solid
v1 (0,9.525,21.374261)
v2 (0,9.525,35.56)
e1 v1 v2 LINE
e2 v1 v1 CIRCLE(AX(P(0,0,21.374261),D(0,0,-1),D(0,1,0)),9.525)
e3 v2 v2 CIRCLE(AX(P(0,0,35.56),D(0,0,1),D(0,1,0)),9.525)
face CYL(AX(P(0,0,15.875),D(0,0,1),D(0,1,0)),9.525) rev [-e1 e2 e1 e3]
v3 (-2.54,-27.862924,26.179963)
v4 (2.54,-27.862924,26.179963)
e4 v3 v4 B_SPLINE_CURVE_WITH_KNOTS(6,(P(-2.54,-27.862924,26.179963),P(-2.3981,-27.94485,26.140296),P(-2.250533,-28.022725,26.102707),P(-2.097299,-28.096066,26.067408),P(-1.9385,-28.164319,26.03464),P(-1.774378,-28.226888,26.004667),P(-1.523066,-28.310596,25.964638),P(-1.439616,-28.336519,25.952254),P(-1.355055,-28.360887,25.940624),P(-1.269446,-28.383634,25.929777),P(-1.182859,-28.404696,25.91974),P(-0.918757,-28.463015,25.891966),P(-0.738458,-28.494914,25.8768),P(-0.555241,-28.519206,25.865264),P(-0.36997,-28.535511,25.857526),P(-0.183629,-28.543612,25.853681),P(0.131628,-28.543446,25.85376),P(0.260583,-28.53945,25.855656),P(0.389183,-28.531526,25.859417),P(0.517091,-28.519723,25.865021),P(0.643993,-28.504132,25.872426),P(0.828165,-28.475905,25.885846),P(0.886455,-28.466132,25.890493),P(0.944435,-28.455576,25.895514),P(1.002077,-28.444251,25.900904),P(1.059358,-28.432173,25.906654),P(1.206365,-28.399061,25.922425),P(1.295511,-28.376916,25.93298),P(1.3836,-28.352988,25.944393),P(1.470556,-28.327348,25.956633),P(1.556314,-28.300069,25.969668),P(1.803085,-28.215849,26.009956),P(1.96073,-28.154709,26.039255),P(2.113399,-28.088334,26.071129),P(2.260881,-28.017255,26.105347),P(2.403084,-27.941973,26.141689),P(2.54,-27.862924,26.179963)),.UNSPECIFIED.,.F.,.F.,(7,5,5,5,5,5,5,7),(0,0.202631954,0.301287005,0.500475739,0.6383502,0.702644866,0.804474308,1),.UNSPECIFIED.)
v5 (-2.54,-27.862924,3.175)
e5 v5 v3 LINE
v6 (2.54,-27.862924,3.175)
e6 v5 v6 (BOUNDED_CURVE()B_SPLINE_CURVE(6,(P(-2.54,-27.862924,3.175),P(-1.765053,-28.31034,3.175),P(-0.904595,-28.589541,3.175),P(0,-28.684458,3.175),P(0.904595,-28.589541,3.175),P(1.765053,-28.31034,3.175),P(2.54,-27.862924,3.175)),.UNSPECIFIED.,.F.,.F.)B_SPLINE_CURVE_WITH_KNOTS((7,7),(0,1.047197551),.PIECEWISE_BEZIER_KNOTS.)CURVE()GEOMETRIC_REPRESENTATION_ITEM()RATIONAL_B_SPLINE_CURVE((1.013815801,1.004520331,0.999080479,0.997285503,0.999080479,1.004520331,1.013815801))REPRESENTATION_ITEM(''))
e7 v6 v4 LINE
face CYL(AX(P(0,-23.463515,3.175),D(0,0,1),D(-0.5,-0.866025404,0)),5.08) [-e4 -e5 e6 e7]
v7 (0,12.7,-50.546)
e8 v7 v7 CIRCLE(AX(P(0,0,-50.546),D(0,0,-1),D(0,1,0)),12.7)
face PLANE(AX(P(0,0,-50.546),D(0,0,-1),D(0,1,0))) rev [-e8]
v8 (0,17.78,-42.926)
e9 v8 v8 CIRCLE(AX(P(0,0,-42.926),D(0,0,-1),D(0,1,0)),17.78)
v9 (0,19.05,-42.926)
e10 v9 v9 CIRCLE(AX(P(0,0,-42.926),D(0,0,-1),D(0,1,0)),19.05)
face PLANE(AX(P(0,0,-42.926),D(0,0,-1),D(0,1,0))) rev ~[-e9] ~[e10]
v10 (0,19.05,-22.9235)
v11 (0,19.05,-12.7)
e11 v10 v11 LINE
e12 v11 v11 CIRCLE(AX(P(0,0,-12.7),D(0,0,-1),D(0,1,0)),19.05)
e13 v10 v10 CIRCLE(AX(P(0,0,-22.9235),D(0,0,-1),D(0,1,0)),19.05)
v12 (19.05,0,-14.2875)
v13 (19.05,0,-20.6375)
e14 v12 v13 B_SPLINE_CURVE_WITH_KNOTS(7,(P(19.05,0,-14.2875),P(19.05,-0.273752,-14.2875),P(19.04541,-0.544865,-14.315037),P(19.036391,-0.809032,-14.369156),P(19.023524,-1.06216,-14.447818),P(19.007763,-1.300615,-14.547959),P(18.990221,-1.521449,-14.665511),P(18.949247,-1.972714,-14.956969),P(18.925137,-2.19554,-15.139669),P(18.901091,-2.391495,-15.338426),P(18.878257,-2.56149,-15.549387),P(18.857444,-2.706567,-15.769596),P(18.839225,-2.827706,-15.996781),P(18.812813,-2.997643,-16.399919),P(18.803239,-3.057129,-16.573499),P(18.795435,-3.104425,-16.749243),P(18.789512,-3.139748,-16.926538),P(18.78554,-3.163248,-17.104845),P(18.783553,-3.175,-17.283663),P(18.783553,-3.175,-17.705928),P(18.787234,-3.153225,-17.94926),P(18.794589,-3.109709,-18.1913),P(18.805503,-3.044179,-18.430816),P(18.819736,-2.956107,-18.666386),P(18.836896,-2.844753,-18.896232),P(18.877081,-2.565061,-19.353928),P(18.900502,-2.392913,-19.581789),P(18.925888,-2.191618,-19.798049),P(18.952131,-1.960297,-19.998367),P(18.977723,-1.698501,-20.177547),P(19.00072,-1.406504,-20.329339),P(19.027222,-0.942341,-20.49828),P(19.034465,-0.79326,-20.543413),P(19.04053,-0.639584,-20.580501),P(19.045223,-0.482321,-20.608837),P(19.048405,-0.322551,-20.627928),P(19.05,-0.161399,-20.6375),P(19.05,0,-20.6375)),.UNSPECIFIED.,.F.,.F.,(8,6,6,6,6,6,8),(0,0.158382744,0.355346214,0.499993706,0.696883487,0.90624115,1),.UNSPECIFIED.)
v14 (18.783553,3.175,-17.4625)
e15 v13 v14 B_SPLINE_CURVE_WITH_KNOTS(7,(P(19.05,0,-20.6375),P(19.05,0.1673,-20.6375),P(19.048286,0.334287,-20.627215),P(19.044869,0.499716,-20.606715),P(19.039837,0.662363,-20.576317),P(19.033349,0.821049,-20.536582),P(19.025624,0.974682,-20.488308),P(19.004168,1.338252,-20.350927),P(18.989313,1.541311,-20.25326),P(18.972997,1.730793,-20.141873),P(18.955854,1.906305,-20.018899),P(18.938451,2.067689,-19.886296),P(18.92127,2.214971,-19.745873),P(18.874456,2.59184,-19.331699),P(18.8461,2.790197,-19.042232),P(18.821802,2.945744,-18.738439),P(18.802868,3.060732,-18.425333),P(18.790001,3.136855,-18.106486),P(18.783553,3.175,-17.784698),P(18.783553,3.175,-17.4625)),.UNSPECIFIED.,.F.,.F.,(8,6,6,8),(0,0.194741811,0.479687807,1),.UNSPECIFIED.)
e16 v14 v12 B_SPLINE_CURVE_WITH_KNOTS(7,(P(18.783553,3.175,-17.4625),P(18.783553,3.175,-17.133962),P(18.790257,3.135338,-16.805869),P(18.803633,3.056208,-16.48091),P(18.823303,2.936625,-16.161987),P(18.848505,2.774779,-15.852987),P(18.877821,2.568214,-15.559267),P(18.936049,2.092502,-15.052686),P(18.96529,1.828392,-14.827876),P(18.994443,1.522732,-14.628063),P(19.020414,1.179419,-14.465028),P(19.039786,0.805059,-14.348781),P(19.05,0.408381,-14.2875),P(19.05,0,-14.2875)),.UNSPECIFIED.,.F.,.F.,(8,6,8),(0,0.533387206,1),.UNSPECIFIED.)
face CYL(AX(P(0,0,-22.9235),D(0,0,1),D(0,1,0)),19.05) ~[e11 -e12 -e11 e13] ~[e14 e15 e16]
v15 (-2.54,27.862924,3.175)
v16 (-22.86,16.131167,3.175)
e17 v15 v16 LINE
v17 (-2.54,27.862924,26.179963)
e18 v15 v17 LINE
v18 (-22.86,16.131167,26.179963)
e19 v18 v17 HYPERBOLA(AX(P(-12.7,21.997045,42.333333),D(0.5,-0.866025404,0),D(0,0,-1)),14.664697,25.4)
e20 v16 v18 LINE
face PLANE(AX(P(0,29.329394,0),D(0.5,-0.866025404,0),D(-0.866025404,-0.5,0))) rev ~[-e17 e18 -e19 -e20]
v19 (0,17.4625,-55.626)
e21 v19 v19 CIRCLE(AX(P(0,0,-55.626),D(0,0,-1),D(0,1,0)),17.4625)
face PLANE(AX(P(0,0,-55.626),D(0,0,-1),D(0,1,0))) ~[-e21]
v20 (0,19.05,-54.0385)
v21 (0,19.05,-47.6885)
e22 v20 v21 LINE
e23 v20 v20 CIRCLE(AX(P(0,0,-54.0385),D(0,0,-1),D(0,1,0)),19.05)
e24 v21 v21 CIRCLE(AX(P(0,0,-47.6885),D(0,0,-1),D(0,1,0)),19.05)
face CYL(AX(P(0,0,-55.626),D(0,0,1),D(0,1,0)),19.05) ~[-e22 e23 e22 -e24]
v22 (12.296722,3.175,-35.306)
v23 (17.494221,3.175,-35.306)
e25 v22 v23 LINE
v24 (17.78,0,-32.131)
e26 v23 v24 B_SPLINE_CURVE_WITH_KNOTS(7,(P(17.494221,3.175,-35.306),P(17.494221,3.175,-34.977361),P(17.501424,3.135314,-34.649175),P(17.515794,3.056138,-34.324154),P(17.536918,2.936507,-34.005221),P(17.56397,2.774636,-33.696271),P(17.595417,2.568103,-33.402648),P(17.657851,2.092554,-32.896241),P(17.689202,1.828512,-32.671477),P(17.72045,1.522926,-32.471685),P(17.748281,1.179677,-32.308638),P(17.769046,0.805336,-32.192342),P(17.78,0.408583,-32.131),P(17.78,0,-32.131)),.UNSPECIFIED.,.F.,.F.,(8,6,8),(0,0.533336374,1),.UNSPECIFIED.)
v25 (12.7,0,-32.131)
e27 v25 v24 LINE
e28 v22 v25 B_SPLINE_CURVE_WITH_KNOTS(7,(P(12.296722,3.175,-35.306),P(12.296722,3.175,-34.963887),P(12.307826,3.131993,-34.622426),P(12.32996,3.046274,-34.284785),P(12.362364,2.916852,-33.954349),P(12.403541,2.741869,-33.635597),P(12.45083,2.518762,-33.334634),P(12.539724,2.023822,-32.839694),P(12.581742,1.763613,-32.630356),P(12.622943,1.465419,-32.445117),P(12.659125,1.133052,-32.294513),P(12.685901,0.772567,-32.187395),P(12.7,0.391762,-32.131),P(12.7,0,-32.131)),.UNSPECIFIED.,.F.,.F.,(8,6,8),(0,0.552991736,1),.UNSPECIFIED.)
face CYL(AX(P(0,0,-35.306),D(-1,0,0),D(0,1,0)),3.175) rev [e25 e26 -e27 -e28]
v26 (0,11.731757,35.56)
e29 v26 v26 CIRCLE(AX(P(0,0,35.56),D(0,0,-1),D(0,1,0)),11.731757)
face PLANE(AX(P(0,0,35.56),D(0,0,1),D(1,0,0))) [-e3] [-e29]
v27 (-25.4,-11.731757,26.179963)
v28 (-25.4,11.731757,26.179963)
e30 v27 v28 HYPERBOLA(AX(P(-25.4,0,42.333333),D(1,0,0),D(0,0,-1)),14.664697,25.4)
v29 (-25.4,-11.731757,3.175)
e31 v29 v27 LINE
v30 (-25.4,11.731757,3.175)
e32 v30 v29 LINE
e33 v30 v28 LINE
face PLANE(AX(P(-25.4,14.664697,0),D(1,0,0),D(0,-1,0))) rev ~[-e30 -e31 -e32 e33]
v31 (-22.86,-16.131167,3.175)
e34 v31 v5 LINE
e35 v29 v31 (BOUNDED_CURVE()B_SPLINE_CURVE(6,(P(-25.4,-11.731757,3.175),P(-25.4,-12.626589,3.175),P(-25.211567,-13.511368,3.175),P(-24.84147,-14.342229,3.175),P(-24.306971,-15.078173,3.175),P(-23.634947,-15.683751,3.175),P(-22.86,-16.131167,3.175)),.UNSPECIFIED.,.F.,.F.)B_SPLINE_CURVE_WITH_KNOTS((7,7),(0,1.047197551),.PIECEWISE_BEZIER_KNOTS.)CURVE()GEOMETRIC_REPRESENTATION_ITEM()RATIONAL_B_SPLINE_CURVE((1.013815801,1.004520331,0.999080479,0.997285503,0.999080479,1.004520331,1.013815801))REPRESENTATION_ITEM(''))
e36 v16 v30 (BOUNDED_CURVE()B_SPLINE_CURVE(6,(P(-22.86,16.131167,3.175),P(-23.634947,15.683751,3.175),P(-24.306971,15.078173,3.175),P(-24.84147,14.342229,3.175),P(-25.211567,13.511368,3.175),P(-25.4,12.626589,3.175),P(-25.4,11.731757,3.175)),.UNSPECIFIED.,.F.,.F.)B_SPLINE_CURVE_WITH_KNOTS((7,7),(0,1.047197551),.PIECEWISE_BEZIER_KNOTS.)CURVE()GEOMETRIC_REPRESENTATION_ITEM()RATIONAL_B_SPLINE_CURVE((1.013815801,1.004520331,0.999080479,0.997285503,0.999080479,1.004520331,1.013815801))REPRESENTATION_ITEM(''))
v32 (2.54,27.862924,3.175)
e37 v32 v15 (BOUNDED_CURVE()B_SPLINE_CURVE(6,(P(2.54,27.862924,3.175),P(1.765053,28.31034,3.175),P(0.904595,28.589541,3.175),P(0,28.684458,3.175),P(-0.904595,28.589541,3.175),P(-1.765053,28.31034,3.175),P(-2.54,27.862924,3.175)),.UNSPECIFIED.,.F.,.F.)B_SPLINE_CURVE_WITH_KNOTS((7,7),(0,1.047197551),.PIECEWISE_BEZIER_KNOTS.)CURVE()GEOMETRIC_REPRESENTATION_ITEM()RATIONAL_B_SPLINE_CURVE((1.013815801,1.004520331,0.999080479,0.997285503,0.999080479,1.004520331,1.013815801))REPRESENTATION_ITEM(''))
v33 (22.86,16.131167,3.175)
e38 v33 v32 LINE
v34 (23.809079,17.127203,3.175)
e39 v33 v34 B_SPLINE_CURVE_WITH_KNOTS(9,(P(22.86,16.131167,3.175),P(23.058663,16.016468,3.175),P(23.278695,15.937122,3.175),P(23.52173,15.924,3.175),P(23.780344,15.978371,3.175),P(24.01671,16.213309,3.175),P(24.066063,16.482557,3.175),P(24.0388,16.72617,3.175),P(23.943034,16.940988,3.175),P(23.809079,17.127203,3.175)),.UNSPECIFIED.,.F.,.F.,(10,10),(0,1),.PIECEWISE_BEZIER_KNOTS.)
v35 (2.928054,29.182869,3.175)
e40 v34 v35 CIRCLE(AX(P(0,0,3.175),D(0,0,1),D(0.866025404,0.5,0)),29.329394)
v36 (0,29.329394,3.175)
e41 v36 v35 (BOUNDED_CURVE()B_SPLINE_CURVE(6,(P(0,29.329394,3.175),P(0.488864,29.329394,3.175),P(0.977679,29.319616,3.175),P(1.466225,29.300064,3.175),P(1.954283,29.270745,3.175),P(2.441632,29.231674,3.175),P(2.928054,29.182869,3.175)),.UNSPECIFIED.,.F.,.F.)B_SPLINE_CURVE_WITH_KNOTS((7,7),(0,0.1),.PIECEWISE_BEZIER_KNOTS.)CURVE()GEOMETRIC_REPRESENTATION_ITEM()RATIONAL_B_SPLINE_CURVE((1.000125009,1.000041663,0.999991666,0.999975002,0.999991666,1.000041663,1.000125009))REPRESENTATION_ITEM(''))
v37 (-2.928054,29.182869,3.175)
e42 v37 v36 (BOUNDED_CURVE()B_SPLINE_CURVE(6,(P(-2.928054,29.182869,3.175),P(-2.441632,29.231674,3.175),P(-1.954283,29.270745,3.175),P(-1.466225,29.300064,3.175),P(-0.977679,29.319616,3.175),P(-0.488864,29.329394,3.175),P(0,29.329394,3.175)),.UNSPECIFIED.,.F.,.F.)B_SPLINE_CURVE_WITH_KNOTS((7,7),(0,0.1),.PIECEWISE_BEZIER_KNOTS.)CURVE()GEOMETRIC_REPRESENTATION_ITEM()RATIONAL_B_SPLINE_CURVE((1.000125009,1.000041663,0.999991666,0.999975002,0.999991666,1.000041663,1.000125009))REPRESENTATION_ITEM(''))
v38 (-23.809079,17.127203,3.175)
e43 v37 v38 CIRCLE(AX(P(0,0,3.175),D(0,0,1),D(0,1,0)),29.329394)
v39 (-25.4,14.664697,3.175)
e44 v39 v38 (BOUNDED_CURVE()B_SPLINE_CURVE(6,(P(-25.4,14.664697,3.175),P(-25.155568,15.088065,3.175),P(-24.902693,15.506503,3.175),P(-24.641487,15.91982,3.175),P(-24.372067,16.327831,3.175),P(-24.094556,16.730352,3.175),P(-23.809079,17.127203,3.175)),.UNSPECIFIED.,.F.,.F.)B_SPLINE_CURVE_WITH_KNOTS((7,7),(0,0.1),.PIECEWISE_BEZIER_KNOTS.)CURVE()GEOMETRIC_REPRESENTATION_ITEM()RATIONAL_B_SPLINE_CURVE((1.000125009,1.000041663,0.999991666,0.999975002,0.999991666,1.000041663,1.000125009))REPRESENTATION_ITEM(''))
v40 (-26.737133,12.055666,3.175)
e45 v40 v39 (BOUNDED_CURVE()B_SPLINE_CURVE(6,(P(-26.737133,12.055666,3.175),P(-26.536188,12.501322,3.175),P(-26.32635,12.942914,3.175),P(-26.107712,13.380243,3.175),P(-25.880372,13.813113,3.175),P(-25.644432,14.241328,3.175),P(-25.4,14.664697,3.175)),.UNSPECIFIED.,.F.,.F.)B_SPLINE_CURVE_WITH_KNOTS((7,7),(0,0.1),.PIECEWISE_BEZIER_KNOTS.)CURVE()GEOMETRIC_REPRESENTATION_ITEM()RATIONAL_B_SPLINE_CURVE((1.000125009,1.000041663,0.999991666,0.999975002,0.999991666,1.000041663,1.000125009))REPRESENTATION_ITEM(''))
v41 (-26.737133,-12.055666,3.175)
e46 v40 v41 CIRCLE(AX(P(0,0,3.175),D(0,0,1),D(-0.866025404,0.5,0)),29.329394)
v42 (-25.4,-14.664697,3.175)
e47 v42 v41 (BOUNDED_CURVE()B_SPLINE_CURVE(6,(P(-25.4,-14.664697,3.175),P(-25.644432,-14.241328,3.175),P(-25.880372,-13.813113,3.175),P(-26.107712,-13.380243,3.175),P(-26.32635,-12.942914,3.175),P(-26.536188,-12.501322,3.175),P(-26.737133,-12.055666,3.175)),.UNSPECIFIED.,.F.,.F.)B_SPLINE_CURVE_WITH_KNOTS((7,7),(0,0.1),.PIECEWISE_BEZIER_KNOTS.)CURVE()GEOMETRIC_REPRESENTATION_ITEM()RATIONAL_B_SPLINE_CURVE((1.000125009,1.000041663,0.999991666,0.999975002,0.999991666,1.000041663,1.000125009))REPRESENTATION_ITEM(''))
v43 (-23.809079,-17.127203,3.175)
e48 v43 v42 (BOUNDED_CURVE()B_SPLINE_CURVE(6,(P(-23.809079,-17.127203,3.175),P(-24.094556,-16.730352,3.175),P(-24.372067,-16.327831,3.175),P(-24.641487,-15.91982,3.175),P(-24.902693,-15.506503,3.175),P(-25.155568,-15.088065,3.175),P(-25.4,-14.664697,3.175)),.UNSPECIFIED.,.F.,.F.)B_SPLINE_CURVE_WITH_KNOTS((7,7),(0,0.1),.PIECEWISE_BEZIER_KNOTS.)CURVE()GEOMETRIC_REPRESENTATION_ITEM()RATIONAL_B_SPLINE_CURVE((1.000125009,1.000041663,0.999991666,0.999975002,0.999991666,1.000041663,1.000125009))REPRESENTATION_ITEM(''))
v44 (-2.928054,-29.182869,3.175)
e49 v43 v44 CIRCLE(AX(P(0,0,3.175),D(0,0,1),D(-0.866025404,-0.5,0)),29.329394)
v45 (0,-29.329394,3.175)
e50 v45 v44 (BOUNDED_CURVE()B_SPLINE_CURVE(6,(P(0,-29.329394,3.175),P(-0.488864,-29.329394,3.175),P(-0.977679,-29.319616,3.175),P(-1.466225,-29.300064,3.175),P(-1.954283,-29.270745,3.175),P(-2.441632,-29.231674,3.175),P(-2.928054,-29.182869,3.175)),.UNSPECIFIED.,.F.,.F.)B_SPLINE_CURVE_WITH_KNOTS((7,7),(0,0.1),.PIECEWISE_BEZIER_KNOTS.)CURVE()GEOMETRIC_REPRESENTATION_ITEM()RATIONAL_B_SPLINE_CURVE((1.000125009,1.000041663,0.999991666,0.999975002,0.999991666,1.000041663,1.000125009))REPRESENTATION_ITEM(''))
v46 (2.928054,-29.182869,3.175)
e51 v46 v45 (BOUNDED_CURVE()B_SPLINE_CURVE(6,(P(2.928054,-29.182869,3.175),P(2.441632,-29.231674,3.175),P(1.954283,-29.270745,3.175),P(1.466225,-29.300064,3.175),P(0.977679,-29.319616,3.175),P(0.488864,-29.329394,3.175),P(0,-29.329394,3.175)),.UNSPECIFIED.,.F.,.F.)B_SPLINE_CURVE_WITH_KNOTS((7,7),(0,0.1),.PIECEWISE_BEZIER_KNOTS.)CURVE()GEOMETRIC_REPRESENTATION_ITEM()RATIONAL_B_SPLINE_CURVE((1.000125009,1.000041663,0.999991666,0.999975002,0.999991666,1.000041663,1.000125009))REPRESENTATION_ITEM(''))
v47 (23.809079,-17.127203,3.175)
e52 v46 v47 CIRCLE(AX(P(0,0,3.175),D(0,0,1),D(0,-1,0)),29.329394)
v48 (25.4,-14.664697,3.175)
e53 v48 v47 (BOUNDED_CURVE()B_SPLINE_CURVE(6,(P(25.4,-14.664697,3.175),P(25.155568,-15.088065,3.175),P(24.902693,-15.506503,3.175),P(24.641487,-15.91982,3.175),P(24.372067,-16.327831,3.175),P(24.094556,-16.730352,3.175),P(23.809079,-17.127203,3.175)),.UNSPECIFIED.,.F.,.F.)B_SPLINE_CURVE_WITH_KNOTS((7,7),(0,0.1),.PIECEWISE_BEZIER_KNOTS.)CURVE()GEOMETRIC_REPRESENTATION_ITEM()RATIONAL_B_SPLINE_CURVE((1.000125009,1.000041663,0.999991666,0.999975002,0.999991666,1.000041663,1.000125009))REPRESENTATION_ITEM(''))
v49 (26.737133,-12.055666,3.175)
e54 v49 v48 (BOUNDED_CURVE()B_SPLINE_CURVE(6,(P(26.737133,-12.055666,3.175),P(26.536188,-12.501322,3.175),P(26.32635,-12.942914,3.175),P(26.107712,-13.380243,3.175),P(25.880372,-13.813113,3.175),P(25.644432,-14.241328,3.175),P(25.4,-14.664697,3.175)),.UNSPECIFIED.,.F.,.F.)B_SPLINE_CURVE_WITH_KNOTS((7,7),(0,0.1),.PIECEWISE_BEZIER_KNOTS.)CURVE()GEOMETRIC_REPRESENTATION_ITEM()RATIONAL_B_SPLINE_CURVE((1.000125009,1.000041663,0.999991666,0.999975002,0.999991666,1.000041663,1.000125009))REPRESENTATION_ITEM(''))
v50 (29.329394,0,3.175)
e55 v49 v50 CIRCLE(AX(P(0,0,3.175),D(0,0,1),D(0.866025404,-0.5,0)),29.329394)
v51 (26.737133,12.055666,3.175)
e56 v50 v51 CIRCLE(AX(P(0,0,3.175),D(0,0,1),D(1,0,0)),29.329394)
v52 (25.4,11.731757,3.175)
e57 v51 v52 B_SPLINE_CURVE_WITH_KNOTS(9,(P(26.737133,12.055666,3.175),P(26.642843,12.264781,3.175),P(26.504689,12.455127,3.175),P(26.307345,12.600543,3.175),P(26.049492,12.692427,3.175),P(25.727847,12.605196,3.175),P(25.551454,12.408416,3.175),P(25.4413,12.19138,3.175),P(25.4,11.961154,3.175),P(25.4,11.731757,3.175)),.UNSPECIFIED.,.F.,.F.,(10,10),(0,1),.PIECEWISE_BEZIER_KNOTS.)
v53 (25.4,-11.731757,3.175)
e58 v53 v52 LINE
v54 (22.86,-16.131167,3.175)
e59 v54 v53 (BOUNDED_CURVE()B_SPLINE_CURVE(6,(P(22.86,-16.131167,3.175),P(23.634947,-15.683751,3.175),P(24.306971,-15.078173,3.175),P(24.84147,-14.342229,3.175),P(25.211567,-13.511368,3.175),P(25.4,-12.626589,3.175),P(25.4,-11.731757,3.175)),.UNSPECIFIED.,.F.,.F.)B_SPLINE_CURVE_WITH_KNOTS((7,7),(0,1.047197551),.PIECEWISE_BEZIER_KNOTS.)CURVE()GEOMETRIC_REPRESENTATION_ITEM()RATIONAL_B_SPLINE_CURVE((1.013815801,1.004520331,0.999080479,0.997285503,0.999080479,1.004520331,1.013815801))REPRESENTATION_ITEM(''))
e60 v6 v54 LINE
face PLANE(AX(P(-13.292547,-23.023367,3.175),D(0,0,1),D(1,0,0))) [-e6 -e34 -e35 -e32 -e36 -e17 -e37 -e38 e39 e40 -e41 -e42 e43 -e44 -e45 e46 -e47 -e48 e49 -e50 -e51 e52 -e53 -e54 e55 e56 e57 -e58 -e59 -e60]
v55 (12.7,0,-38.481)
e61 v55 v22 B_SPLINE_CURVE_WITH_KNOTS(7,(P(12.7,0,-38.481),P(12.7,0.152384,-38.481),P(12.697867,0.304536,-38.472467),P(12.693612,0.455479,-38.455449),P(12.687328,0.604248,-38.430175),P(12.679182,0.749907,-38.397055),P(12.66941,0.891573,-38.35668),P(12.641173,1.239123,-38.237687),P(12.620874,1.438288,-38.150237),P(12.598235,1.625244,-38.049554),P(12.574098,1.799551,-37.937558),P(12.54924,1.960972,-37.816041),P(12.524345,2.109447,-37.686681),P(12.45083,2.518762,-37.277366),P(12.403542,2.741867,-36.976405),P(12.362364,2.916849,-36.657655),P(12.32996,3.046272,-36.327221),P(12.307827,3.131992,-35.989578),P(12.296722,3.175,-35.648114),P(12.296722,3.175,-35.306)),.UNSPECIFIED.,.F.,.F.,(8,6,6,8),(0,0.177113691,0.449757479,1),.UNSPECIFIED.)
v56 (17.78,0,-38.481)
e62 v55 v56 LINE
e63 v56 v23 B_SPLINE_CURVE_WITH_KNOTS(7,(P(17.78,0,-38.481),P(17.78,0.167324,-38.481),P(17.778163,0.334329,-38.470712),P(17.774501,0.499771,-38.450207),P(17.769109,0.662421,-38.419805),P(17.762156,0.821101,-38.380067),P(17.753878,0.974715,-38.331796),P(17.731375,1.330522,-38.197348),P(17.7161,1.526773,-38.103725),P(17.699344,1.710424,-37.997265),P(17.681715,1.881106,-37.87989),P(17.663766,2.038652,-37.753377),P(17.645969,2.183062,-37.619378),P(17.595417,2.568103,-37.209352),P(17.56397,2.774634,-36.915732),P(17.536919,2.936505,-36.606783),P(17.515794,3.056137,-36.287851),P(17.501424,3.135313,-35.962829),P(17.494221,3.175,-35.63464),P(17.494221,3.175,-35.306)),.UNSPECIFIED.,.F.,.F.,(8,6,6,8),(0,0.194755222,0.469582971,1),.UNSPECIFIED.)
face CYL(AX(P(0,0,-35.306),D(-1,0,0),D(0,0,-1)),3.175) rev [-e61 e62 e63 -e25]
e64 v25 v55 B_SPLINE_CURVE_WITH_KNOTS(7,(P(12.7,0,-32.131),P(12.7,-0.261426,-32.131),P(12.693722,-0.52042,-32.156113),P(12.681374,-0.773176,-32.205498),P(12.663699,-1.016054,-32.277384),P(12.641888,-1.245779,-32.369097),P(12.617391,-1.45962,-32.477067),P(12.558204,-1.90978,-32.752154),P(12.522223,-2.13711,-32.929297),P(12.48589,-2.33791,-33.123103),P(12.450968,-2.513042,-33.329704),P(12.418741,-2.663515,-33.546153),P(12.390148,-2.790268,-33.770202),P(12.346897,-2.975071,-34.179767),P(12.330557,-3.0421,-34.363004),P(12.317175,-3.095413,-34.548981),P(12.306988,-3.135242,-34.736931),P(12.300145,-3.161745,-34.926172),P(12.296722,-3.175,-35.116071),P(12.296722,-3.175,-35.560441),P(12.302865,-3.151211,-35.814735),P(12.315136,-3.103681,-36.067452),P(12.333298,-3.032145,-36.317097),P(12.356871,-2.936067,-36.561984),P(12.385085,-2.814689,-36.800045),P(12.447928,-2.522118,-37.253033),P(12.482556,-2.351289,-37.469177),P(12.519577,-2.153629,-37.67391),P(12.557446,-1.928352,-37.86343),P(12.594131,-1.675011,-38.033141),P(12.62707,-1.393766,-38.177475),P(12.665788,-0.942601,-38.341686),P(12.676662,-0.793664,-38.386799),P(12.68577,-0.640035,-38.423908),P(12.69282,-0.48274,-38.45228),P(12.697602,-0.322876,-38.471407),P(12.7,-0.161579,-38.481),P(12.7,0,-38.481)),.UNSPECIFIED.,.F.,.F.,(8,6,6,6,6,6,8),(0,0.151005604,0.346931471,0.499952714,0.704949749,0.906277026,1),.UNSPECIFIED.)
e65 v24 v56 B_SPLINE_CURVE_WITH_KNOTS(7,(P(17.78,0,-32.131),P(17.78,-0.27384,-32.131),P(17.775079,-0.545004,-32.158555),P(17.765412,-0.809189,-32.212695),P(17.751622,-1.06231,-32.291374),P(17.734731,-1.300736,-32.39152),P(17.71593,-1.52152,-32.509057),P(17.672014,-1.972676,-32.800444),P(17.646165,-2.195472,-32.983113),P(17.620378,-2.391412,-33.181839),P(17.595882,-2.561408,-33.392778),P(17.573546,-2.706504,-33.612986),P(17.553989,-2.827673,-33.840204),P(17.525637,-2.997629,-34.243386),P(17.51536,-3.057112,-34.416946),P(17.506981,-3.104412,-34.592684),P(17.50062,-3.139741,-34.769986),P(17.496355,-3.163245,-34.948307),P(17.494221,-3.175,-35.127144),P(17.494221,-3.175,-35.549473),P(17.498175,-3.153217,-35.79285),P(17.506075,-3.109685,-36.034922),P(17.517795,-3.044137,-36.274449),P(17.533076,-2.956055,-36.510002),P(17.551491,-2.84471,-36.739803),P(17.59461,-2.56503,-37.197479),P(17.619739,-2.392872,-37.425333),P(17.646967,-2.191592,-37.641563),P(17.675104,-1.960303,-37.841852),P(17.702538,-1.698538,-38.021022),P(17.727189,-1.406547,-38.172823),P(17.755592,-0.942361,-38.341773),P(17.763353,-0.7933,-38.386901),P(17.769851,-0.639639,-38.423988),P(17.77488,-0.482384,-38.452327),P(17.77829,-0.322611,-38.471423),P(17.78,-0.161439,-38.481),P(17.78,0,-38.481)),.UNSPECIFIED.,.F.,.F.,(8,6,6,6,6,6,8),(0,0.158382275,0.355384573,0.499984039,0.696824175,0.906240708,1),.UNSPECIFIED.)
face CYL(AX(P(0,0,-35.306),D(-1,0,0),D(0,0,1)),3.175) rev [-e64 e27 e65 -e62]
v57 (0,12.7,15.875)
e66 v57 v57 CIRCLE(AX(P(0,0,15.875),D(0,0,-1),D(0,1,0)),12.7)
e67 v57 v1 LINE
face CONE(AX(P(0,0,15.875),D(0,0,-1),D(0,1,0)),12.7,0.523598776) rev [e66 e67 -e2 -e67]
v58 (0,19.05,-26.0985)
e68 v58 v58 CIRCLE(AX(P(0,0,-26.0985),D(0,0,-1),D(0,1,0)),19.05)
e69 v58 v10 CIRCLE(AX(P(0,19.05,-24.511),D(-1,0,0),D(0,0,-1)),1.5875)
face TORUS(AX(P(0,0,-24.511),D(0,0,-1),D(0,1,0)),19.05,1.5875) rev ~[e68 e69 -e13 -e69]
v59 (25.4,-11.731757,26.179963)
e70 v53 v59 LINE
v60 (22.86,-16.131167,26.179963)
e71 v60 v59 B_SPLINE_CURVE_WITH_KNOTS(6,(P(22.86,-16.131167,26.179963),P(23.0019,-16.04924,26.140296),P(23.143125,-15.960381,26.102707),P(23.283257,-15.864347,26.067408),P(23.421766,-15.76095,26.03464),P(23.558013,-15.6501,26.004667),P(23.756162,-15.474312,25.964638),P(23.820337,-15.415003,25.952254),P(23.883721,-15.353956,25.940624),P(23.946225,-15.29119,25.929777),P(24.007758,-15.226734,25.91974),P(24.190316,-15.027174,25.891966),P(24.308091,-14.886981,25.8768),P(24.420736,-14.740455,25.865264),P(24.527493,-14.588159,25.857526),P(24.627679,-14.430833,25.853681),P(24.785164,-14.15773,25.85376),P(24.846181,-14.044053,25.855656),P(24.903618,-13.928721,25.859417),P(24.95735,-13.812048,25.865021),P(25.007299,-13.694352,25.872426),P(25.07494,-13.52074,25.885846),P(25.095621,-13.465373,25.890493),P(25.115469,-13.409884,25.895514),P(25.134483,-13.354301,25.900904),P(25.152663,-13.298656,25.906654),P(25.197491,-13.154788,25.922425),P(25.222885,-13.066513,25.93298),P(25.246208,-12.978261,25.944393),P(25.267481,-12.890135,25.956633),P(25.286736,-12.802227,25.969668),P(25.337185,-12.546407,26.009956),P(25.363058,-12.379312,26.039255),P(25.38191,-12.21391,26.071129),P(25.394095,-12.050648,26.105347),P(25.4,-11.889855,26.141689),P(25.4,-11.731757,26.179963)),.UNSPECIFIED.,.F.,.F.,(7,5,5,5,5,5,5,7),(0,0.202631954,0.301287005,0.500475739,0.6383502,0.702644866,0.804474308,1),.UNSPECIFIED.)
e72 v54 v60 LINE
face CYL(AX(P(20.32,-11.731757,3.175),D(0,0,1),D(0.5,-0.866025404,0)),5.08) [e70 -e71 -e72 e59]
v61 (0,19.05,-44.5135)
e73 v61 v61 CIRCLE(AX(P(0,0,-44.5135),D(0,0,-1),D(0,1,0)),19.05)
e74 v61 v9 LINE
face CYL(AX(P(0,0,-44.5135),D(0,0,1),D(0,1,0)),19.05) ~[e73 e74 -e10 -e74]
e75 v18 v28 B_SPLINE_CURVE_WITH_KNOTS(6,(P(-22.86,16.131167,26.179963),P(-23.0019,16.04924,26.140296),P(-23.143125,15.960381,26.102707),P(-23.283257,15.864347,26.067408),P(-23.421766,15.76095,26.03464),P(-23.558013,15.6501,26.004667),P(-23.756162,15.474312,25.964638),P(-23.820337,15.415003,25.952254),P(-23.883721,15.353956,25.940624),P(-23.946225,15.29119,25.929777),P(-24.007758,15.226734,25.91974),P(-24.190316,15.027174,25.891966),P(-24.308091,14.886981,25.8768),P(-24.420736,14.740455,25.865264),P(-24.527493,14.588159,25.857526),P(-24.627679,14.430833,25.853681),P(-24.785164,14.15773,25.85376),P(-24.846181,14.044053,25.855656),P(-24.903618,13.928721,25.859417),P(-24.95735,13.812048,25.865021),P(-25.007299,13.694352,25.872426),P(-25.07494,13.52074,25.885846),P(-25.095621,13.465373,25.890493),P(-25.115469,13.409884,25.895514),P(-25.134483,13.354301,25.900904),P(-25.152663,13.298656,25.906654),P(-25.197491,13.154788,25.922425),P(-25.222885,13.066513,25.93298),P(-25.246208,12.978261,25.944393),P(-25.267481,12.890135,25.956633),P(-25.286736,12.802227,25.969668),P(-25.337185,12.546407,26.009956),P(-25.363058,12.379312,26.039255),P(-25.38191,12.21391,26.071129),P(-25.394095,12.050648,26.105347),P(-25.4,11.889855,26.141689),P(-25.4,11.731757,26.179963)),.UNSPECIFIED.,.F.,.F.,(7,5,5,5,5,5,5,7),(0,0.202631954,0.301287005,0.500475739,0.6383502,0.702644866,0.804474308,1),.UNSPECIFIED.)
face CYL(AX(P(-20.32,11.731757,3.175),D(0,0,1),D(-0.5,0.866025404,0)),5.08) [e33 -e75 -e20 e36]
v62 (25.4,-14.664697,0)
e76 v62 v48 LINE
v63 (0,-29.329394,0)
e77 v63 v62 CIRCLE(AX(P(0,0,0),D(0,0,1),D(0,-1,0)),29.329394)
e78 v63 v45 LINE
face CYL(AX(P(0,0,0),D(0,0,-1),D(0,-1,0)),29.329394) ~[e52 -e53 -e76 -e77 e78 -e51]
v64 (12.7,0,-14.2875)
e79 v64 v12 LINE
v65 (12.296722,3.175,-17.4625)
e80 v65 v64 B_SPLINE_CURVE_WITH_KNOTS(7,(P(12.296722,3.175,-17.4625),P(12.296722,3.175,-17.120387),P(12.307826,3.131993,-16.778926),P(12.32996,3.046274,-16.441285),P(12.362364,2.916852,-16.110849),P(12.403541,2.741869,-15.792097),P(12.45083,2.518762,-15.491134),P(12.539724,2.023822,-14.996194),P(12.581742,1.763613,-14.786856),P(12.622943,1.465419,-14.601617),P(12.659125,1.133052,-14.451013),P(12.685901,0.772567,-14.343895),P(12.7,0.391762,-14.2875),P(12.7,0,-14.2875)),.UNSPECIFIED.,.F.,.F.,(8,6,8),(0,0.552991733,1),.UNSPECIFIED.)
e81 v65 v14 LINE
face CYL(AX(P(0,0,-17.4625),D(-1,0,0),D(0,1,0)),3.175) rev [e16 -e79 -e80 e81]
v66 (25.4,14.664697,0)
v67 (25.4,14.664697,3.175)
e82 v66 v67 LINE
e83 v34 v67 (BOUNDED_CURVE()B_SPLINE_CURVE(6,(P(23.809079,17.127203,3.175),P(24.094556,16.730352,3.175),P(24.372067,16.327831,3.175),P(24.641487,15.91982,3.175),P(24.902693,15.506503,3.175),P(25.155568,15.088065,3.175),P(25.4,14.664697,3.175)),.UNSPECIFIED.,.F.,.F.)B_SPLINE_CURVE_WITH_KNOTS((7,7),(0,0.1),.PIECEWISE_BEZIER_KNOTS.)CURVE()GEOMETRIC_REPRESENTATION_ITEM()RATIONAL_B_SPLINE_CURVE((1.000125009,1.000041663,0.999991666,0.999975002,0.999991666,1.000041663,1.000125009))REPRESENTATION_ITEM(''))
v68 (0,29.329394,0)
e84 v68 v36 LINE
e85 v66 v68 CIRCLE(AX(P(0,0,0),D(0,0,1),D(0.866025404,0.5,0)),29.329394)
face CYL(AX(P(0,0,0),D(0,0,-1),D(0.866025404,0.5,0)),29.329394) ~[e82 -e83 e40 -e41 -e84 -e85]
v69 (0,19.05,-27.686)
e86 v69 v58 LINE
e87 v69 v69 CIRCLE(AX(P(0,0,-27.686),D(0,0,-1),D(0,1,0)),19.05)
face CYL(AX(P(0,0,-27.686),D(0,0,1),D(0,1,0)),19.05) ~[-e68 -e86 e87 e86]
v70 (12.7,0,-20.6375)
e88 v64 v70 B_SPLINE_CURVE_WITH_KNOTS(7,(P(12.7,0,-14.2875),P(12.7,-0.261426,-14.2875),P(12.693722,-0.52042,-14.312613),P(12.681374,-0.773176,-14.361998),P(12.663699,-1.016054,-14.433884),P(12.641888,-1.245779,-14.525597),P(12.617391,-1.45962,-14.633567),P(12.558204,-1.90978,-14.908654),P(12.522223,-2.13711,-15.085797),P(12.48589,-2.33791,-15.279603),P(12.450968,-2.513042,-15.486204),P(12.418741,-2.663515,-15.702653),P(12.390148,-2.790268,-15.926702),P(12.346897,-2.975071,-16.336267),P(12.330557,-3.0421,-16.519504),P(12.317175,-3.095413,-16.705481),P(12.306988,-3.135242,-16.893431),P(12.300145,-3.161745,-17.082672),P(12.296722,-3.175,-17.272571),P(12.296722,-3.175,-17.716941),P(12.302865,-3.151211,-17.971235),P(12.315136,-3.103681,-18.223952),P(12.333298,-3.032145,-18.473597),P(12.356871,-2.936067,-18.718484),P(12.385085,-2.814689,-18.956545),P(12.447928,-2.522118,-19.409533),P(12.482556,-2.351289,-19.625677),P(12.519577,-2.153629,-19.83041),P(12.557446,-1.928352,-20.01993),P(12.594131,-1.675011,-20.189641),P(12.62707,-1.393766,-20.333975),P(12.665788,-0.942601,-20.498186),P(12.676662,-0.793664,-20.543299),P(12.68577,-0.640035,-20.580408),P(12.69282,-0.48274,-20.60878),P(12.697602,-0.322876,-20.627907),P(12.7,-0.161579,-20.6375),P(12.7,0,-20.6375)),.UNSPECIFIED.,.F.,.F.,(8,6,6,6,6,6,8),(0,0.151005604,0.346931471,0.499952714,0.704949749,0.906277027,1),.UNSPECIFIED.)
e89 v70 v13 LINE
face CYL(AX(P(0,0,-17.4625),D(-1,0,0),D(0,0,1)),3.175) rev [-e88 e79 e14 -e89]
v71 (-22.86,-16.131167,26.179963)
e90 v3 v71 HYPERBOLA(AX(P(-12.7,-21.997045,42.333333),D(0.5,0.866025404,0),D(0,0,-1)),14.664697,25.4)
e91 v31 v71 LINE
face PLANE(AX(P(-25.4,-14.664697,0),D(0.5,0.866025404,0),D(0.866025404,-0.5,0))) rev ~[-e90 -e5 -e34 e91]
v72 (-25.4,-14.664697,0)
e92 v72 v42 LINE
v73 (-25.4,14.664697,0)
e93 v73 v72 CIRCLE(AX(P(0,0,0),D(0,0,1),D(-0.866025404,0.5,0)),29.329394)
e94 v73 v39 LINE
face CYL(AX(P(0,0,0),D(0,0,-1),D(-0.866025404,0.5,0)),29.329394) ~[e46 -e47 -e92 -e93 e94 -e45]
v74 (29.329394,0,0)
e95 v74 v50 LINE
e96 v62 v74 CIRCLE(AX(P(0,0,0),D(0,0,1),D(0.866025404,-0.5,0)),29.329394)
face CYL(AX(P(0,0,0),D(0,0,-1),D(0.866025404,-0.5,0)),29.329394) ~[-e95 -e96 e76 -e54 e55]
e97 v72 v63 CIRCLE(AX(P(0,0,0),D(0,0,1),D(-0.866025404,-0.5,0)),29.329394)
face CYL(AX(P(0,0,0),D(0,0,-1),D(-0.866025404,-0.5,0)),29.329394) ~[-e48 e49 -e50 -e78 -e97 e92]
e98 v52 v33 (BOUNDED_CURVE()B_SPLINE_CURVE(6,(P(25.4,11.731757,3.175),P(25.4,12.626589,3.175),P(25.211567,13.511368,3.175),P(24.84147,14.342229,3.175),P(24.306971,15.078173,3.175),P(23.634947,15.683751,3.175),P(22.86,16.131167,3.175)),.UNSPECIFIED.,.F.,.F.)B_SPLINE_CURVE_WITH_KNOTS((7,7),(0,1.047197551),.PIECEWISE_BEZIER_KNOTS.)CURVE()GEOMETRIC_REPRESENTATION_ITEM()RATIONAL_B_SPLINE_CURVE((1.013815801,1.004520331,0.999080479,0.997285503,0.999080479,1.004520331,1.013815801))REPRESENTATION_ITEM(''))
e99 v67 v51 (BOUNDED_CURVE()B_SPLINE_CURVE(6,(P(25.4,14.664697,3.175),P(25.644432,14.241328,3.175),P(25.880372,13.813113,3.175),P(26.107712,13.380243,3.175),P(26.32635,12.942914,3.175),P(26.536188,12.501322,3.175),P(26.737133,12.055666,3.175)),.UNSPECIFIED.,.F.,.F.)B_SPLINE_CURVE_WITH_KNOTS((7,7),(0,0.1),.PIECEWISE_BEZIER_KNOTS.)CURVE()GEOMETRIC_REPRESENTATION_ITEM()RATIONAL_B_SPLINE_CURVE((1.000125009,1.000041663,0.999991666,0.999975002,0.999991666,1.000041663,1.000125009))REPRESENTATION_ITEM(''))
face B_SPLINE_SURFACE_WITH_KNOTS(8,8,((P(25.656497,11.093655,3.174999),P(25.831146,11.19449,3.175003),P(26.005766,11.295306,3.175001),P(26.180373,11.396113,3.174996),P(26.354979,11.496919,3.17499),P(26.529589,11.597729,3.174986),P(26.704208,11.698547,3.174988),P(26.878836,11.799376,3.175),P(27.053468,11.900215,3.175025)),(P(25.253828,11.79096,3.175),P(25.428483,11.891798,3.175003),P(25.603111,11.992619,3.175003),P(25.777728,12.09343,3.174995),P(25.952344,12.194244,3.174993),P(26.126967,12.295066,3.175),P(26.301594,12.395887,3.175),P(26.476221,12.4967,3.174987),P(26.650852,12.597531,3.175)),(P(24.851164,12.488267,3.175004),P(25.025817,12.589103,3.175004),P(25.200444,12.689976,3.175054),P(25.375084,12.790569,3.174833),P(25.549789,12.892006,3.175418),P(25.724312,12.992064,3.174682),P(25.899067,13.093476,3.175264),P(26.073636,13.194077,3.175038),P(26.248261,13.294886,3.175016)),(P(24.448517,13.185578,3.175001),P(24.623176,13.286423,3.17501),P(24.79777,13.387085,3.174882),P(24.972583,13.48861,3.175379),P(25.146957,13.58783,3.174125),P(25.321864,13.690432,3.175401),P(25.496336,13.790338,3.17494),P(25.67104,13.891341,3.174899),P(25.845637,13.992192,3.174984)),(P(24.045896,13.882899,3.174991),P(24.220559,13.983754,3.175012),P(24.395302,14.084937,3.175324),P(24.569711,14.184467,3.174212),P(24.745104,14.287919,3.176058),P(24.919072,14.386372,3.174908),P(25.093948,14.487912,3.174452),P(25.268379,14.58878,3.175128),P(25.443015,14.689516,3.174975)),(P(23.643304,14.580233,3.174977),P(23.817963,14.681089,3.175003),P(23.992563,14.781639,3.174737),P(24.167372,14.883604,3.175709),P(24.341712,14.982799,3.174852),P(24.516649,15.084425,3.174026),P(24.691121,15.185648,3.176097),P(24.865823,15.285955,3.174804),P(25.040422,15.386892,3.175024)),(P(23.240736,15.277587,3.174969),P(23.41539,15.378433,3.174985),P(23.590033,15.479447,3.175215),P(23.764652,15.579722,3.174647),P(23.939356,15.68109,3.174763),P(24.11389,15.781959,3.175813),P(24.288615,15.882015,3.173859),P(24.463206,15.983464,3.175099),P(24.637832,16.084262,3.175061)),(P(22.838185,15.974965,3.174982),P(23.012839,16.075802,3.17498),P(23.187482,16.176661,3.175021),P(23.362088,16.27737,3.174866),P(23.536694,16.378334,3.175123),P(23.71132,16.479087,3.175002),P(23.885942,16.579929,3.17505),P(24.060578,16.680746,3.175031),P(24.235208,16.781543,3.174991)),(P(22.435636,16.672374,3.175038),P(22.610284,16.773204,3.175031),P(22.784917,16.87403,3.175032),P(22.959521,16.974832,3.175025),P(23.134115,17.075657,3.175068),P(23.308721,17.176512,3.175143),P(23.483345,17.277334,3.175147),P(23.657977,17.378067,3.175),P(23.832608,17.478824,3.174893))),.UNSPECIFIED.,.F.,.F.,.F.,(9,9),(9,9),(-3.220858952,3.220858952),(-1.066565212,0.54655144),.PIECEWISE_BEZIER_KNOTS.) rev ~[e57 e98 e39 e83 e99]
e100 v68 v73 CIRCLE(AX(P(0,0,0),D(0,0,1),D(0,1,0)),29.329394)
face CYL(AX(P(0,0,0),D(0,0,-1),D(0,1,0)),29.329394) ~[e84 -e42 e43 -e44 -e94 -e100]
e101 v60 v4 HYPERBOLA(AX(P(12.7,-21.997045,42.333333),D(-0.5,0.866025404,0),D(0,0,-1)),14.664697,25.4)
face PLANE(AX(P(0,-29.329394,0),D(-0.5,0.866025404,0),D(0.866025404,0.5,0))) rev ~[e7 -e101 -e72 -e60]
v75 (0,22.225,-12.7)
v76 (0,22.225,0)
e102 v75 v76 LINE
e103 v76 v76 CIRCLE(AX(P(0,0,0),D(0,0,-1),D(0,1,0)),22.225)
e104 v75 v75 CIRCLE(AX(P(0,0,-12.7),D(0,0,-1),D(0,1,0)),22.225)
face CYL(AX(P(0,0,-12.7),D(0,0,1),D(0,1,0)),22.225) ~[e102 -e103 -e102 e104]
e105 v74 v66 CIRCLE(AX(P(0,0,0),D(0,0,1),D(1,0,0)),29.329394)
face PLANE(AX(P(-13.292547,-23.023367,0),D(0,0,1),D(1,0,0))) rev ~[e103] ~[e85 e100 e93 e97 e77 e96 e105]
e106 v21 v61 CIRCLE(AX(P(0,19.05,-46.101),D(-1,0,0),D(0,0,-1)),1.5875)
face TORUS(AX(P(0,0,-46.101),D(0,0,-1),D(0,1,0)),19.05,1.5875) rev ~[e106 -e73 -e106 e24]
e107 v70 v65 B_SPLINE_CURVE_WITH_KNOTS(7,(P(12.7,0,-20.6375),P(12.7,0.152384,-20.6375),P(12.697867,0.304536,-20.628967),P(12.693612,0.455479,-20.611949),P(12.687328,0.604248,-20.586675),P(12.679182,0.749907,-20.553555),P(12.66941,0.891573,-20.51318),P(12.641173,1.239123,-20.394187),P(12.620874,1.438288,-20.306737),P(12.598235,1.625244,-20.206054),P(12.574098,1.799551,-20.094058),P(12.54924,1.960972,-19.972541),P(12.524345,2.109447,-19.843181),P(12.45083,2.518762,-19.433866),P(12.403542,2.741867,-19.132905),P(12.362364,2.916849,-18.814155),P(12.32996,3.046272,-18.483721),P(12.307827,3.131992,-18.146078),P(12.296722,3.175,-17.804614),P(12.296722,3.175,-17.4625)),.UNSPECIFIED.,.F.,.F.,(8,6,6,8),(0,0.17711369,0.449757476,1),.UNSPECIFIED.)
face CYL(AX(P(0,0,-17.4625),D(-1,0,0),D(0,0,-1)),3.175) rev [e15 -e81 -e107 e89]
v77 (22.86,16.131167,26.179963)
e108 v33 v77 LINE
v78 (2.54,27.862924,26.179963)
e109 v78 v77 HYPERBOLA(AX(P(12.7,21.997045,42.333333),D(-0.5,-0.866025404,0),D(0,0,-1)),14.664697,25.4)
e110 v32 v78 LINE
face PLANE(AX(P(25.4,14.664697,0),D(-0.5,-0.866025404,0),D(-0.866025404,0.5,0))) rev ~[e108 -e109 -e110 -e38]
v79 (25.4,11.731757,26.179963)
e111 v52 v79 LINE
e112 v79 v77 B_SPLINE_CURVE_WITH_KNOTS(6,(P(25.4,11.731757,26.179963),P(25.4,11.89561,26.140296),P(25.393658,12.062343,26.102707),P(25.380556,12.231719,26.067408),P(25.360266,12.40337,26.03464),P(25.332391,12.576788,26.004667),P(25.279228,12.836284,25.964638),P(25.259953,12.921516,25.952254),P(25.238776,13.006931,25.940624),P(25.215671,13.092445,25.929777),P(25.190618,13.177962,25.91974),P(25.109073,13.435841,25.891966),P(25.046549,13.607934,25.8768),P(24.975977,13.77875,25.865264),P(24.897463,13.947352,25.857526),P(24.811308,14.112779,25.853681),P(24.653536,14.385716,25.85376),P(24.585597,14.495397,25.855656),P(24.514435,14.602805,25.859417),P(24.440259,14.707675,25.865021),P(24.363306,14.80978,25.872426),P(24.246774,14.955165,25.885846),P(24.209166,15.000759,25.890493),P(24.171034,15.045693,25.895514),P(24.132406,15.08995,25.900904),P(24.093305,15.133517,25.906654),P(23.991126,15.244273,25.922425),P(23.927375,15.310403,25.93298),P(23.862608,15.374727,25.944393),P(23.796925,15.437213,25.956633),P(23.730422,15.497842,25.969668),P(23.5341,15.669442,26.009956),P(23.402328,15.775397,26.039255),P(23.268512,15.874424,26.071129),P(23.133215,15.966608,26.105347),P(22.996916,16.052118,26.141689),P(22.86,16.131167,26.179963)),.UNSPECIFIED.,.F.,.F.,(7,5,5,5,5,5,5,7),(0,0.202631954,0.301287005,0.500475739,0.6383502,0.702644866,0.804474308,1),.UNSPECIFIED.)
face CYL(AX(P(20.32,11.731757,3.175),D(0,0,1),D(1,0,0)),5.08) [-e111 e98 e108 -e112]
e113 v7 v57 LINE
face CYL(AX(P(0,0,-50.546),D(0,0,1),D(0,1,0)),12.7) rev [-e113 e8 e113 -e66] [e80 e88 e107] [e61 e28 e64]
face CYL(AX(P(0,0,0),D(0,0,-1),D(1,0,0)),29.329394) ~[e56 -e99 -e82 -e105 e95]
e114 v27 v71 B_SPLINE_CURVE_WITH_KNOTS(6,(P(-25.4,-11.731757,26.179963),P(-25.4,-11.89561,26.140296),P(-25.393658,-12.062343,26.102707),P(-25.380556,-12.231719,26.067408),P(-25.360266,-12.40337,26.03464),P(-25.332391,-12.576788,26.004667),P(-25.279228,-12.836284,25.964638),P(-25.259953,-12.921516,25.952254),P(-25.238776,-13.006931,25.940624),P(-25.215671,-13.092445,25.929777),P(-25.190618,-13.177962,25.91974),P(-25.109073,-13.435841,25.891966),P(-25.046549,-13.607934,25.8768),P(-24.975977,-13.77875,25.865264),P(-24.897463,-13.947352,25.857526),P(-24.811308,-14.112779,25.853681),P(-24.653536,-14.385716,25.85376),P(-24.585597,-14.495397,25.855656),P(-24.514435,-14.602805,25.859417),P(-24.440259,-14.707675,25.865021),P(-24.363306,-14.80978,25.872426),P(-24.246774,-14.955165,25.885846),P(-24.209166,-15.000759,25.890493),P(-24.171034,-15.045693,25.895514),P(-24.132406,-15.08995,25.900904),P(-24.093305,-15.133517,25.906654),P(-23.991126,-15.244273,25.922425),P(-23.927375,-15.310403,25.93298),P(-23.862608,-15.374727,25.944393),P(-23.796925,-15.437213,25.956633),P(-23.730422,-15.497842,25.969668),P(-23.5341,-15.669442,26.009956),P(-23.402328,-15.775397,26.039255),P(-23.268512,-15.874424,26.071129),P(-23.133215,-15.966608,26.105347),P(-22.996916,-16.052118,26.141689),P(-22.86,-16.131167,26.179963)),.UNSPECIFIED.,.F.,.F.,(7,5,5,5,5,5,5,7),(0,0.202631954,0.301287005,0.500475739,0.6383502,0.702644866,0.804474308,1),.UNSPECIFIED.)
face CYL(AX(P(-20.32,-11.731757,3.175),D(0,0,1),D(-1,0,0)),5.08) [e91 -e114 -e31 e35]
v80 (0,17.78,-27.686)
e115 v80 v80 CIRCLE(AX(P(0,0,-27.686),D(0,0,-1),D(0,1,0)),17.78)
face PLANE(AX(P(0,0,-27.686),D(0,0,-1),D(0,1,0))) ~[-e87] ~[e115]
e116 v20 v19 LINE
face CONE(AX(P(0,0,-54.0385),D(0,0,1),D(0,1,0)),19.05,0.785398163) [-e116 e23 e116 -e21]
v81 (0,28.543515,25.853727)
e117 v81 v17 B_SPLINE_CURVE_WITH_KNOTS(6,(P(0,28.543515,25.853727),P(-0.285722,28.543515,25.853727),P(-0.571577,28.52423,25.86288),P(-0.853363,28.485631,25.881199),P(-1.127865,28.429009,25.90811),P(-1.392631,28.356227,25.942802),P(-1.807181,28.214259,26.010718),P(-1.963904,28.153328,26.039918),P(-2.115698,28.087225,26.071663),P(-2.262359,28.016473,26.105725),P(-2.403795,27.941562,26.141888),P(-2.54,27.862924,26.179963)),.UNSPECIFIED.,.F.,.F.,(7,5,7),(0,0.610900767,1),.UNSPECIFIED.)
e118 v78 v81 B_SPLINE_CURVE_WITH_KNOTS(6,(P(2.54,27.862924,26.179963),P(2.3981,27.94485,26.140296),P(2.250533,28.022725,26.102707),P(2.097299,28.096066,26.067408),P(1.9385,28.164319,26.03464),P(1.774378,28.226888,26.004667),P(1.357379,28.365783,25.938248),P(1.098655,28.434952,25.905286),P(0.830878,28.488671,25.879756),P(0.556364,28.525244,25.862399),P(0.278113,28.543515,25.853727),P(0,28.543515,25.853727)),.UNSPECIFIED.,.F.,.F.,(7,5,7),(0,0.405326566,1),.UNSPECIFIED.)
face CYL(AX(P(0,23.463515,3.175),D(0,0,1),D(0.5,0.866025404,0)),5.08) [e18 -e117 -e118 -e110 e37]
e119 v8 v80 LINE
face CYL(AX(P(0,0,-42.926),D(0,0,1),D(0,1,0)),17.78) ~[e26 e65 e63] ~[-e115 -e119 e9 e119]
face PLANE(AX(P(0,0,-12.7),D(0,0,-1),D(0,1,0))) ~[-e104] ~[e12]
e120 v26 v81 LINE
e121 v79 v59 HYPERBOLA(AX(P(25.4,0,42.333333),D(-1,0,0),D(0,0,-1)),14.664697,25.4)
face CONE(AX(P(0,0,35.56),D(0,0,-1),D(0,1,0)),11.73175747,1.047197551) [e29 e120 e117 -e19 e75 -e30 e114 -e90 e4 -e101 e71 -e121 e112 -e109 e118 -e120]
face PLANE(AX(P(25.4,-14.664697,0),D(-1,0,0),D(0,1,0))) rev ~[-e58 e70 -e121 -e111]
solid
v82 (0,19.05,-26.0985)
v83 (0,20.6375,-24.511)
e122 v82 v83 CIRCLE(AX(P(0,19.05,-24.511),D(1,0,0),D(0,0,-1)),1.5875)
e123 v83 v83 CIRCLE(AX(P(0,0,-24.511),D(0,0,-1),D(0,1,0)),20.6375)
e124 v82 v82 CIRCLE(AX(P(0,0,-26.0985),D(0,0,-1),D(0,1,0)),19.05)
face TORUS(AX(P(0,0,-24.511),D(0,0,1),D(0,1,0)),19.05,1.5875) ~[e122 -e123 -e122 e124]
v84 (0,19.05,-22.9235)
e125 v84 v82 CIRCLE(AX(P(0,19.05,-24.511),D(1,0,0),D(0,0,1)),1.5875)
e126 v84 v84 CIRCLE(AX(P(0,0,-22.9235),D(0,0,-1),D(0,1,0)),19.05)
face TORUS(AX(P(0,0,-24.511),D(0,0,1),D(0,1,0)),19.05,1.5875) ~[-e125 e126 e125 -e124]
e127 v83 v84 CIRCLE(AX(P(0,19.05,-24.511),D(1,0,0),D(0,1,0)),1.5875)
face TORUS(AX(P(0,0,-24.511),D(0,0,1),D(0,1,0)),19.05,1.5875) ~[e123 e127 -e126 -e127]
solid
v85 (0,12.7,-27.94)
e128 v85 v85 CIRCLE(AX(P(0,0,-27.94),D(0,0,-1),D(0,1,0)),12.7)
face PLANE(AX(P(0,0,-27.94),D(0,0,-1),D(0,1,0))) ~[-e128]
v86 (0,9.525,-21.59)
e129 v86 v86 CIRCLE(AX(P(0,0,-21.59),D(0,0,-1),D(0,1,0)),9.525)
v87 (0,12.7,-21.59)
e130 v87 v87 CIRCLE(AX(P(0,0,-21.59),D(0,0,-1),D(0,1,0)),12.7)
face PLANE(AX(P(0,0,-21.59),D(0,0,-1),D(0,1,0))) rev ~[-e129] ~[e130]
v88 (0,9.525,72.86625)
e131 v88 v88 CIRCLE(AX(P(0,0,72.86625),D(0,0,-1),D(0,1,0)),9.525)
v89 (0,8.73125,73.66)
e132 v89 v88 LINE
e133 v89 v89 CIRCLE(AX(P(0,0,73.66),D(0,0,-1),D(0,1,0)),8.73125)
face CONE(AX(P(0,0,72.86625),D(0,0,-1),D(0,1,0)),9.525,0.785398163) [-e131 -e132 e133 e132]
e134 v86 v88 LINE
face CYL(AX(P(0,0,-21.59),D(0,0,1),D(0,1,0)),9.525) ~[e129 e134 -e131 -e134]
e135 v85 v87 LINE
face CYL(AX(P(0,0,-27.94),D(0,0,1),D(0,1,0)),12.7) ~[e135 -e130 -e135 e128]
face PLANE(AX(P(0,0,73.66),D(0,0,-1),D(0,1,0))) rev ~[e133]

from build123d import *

# Parameters (mm, degrees)
F0_R     = 7.9375
F1_DEPTH = 35.56
F2_DEPTH = 3.175
F3_R     = 5.08
F7_SIZE  = 1.5875
F9_DEPTH = 29.3303937748
F10_W    = 9.525
F10_H    = 37.465
F10_W_2  = 3.175
F10_W_3  = 12.7
F10_H_2  = 22.606
F13_SIZE = 0.79375


with BuildPart() as f1:
    # F0 (on Top) → F1 (new body)
    with BuildSketch(Plane.XY):
        Polygon((25.4, -14.6646968374), (25.4, 14.6646968374), (0, 29.3293936748), (-25.4, 14.6646968374), (-25.4, -14.6646968374), (0, -29.3293936748), align=None)
        Circle(F0_R, mode=Mode.SUBTRACT)
        Circle(F0_R)
    extrude(amount=F1_DEPTH)

    # F0 (on Top) → F2 (join)
    with BuildSketch(Plane.XY):
        with BuildLine():
            ThreePointArc((-25.4, -14.6646968374), (-14.6646968374, -25.4), (0, -29.3293936748))
            Line((0, -29.3293936748), (-25.4, -14.6646968374))
        make_face()
        with BuildLine():
            ThreePointArc((0, -29.3293936748), (14.6646968374, -25.4), (25.4, -14.6646968374))
            Line((25.4, -14.6646968374), (0, -29.3293936748))
        make_face()
        with BuildLine():
            ThreePointArc((25.4, -14.6646968374), (28.3300188199, -7.5910056644), (29.3293936748, 0))
            ThreePointArc((29.3293936748, 0), (28.3300188199, 7.5910056644), (25.4, 14.6646968374))
            Line((25.4, 14.6646968374), (25.4, -14.6646968374))
        make_face()
        Polygon((25.4, -14.6646968374), (25.4, 14.6646968374), (0, 29.3293936748), (-25.4, 14.6646968374), (-25.4, -14.6646968374), (0, -29.3293936748), align=None)
        Circle(F0_R, mode=Mode.SUBTRACT)
        with BuildLine():
            Line((0, 29.3293936748), (25.4, 14.6646968374))
            ThreePointArc((25.4, 14.6646968374), (14.6646968374, 25.4), (0, 29.3293936748))
        make_face()
        with BuildLine():
            Line((-25.4, 14.6646968374), (0, 29.3293936748))
            ThreePointArc((0, 29.3293936748), (-14.6646968374, 25.4), (-25.4, 14.6646968374))
        make_face()
        with BuildLine():
            Line((-25.4, -14.6646968374), (-25.4, 14.6646968374))
            ThreePointArc((-25.4, 14.6646968374), (-29.3293936748, 0), (-25.4, -14.6646968374))
        make_face()
    extrude(amount=F2_DEPTH)

    # F3 (call 1 of 6: OpenCascade refuses the feature's edges together)
    f3_edges = [f1.edges().sort_by_distance(p)[0] for p in [
        (0, -29.329394, 19.3675),
    ]]
    fillet(f3_edges, radius=F3_R)

    # F3#2 (call 2 of 6)
    f3_2_edges = [f1.edges().sort_by_distance(p)[0] for p in [
        (25.4, -14.664697, 19.3675),
    ]]
    fillet(f3_2_edges, radius=F3_R)

    # F3#3 (call 3 of 6)
    f3_3_edges = [f1.edges().sort_by_distance(p)[0] for p in [
        (25.4, 14.664697, 19.3675),
    ]]
    fillet(f3_3_edges, radius=F3_R)

    # F3#4 (call 4 of 6)
    f3_4_edges = [f1.edges().sort_by_distance(p)[0] for p in [
        (0, 29.329394, 19.3675),
    ]]
    fillet(f3_4_edges, radius=F3_R)

    # F3#5 (call 5 of 6)
    f3_5_edges = [f1.edges().sort_by_distance(p)[0] for p in [
        (-25.4, 14.664697, 19.3675),
    ]]
    fillet(f3_5_edges, radius=F3_R)

    # F3#6 (call 6 of 6)
    f3_6_edges = [f1.edges().sort_by_distance(p)[0] for p in [
        (-25.4, -14.664697, 19.3675),
    ]]
    fillet(f3_6_edges, radius=F3_R)

    # F4 (on Right) → F5 (revolve, cut)
    with BuildSketch(Plane.YZ):
        Polygon((35.3962906179, 35.56), (11.7317574699, 35.56), (35.3962906179, 21.8972754168), align=None)
    revolve(axis=Axis((0, 0, 25.9955581278), (0, 0, -1)), mode=Mode.SUBTRACT)

    # F4 (on Right) → F6 (revolve)
    with BuildSketch(Plane.YZ):
        with BuildLine():
            Line((17.78, -27.686), (0, -27.686))
            Line((0, -27.686), (0, -32.131))
            ThreePointArc((0, -32.131), (2.2450640303, -33.0609359697), (3.175, -35.306))
            ThreePointArc((3.175, -35.306), (2.2450640303, -37.5510640303), (0, -38.481))
            Line((0, -38.481), (0, -42.926))
            Line((0, -42.926), (17.78, -42.926))
            Line((17.78, -42.926), (17.78, -27.686))
        make_face()
        with BuildLine():
            Line((19.05, -12.7), (0, -12.7))
            Line((0, -12.7), (0, -14.2875))
            ThreePointArc((0, -14.2875), (2.2450640303, -15.2174359697), (3.175, -17.4625))
            ThreePointArc((3.175, -17.4625), (2.2450640303, -19.7075640303), (0, -20.6375))
            Line((0, -20.6375), (0, -27.686))
            Line((0, -27.686), (17.78, -27.686))
            Line((17.78, -27.686), (19.05, -27.686))
            Line((19.05, -27.686), (19.05, -26.0985))
            ThreePointArc((19.05, -26.0985), (17.4625, -24.511), (19.05, -22.9235))
            Line((19.05, -22.9235), (19.05, -12.7))
        make_face()
        Polygon((22.225, 0), (0, 0), (0, -12.7), (19.05, -12.7), (22.225, -12.7), align=None)
        with BuildLine():
            Line((19.05, -42.926), (17.78, -42.926))
            Line((17.78, -42.926), (0, -42.926))
            Line((0, -42.926), (0, -55.626))
            Line((0, -55.626), (19.05, -55.626))
            Line((19.05, -55.626), (19.05, -47.6885))
            ThreePointArc((19.05, -47.6885), (17.4625, -46.101), (19.05, -44.5135))
            Line((19.05, -44.5135), (19.05, -42.926))
        make_face()
    revolve(axis=Axis((0, 0, 25.9955581278), (0, 0, -1)))

    # F7
    f7_edges = [f1.edges().sort_by_distance(p)[0] for p in [
        (0, -19.05, -55.626),
    ]]
    chamfer(f7_edges, length=F7_SIZE)


with BuildPart() as f8:
    # F4 (on Right) → F8 (revolve)
    with BuildSketch(Plane.YZ):
        with BuildLine():
            Line((0, -20.6375), (0, -14.2875))
            ThreePointArc((0, -14.2875), (-3.175, -17.4625), (0, -20.6375))
        make_face()
    revolve(axis=Axis((0, 0, 25.9955581278), (0, 0, -1)))


with BuildPart() as f8b:
    # F4 (on Right) → F8, piece 2 (revolve)
    with BuildSketch(Plane.YZ):
        with BuildLine():
            ThreePointArc((20.6375, -24.511), (20.1725320151, -23.3884679849), (19.05, -22.9235))
            Line((19.05, -22.9235), (19.05, -26.0985))
            ThreePointArc((19.05, -26.0985), (20.1725320151, -25.6335320151), (20.6375, -24.511))
        make_face()
        with BuildLine():
            Line((19.05, -26.0985), (19.05, -22.9235))
            ThreePointArc((19.05, -22.9235), (17.4625, -24.511), (19.05, -26.0985))
        make_face()
    revolve(axis=Axis((0, 0, 25.9955581278), (0, 0, -1)))


with BuildPart() as f9_tool:
    # F4 (on Right) → F9 (new body, through all)
    with BuildSketch(Plane.YZ):
        with BuildLine():
            Line((0, -20.6375), (0, -14.2875))
            ThreePointArc((0, -14.2875), (-3.175, -17.4625), (0, -20.6375))
        make_face()
        with BuildLine():
            ThreePointArc((3.175, -17.4625), (2.2450640303, -15.2174359697), (0, -14.2875))
            Line((0, -14.2875), (0, -20.6375))
            ThreePointArc((0, -20.6375), (2.2450640303, -19.7075640303), (3.175, -17.4625))
        make_face()
        with BuildLine():
            Line((0, -38.481), (0, -32.131))
            ThreePointArc((0, -32.131), (-3.175, -35.306), (0, -38.481))
        make_face()
        with BuildLine():
            ThreePointArc((3.175, -35.306), (2.2450640303, -33.0609359697), (0, -32.131))
            Line((0, -32.131), (0, -38.481))
            ThreePointArc((0, -38.481), (2.2450640303, -37.5510640303), (3.175, -35.306))
        make_face()
    extrude(amount=F9_DEPTH)


with BuildPart() as f1_1:
    add(f1.part)

    # F9: cut by f9_tool
    add(f9_tool.part, mode=Mode.SUBTRACT)


with BuildPart() as f8_1:
    add(f8.part)

    # F9: cut by f9_tool
    add(f9_tool.part, mode=Mode.SUBTRACT)


with BuildPart() as f11_tool:
    # F10 (on Right) → F11 (revolve)
    with BuildSketch(Plane.YZ):
        Polygon((9.525, 73.66), (0, 73.66), (0, 15.875), (9.525, 15.875), (9.525, 21.374261314), align=None)
        Polygon((9.525, 21.374261314), (9.525, 15.875), (12.7, 15.875), align=None)
        with Locations((4.7625, -2.8575)):
            Rectangle(F10_W, F10_H)
        with Locations((11.1125, -2.8575)):
            Rectangle(F10_W_2, F10_H)
        with Locations((6.35, -39.243)):
            Rectangle(F10_W_3, F10_H_2)
        Polygon((9.525, -21.59), (0, -21.59), (0, -27.94), (12.7, -27.94), (12.7, -21.59), align=None)
    revolve(axis=Axis((0, 0, 11.557), (0, 0, -1)))


with BuildPart() as f1_2:
    add(f1_1.part)

    # F11: cut by f11_tool
    add(f11_tool.part, mode=Mode.SUBTRACT)


with BuildPart() as f8_2:
    add(f8_1.part)

    # F11: cut by f11_tool
    add(f11_tool.part, mode=Mode.SUBTRACT)


with BuildPart() as f12:
    # F10 (on Right) → F12 (revolve)
    with BuildSketch(Plane.YZ):
        Polygon((9.525, 73.66), (0, 73.66), (0, 15.875), (9.525, 15.875), (9.525, 21.374261314), align=None)
        with Locations((4.7625, -2.8575)):
            Rectangle(F10_W, F10_H)
        Polygon((9.525, -21.59), (0, -21.59), (0, -27.94), (12.7, -27.94), (12.7, -21.59), align=None)
    revolve(axis=Axis((0, 0, 11.557), (0, 0, -1)))

    # F13
    f13_edges = [f12.edges().sort_by_distance(p)[0] for p in [
        (0, -9.525, 73.66),
    ]]
    chamfer(f13_edges, length=F13_SIZE)


solid = Compound([f8b.part, f1_2.part, f12.part])
